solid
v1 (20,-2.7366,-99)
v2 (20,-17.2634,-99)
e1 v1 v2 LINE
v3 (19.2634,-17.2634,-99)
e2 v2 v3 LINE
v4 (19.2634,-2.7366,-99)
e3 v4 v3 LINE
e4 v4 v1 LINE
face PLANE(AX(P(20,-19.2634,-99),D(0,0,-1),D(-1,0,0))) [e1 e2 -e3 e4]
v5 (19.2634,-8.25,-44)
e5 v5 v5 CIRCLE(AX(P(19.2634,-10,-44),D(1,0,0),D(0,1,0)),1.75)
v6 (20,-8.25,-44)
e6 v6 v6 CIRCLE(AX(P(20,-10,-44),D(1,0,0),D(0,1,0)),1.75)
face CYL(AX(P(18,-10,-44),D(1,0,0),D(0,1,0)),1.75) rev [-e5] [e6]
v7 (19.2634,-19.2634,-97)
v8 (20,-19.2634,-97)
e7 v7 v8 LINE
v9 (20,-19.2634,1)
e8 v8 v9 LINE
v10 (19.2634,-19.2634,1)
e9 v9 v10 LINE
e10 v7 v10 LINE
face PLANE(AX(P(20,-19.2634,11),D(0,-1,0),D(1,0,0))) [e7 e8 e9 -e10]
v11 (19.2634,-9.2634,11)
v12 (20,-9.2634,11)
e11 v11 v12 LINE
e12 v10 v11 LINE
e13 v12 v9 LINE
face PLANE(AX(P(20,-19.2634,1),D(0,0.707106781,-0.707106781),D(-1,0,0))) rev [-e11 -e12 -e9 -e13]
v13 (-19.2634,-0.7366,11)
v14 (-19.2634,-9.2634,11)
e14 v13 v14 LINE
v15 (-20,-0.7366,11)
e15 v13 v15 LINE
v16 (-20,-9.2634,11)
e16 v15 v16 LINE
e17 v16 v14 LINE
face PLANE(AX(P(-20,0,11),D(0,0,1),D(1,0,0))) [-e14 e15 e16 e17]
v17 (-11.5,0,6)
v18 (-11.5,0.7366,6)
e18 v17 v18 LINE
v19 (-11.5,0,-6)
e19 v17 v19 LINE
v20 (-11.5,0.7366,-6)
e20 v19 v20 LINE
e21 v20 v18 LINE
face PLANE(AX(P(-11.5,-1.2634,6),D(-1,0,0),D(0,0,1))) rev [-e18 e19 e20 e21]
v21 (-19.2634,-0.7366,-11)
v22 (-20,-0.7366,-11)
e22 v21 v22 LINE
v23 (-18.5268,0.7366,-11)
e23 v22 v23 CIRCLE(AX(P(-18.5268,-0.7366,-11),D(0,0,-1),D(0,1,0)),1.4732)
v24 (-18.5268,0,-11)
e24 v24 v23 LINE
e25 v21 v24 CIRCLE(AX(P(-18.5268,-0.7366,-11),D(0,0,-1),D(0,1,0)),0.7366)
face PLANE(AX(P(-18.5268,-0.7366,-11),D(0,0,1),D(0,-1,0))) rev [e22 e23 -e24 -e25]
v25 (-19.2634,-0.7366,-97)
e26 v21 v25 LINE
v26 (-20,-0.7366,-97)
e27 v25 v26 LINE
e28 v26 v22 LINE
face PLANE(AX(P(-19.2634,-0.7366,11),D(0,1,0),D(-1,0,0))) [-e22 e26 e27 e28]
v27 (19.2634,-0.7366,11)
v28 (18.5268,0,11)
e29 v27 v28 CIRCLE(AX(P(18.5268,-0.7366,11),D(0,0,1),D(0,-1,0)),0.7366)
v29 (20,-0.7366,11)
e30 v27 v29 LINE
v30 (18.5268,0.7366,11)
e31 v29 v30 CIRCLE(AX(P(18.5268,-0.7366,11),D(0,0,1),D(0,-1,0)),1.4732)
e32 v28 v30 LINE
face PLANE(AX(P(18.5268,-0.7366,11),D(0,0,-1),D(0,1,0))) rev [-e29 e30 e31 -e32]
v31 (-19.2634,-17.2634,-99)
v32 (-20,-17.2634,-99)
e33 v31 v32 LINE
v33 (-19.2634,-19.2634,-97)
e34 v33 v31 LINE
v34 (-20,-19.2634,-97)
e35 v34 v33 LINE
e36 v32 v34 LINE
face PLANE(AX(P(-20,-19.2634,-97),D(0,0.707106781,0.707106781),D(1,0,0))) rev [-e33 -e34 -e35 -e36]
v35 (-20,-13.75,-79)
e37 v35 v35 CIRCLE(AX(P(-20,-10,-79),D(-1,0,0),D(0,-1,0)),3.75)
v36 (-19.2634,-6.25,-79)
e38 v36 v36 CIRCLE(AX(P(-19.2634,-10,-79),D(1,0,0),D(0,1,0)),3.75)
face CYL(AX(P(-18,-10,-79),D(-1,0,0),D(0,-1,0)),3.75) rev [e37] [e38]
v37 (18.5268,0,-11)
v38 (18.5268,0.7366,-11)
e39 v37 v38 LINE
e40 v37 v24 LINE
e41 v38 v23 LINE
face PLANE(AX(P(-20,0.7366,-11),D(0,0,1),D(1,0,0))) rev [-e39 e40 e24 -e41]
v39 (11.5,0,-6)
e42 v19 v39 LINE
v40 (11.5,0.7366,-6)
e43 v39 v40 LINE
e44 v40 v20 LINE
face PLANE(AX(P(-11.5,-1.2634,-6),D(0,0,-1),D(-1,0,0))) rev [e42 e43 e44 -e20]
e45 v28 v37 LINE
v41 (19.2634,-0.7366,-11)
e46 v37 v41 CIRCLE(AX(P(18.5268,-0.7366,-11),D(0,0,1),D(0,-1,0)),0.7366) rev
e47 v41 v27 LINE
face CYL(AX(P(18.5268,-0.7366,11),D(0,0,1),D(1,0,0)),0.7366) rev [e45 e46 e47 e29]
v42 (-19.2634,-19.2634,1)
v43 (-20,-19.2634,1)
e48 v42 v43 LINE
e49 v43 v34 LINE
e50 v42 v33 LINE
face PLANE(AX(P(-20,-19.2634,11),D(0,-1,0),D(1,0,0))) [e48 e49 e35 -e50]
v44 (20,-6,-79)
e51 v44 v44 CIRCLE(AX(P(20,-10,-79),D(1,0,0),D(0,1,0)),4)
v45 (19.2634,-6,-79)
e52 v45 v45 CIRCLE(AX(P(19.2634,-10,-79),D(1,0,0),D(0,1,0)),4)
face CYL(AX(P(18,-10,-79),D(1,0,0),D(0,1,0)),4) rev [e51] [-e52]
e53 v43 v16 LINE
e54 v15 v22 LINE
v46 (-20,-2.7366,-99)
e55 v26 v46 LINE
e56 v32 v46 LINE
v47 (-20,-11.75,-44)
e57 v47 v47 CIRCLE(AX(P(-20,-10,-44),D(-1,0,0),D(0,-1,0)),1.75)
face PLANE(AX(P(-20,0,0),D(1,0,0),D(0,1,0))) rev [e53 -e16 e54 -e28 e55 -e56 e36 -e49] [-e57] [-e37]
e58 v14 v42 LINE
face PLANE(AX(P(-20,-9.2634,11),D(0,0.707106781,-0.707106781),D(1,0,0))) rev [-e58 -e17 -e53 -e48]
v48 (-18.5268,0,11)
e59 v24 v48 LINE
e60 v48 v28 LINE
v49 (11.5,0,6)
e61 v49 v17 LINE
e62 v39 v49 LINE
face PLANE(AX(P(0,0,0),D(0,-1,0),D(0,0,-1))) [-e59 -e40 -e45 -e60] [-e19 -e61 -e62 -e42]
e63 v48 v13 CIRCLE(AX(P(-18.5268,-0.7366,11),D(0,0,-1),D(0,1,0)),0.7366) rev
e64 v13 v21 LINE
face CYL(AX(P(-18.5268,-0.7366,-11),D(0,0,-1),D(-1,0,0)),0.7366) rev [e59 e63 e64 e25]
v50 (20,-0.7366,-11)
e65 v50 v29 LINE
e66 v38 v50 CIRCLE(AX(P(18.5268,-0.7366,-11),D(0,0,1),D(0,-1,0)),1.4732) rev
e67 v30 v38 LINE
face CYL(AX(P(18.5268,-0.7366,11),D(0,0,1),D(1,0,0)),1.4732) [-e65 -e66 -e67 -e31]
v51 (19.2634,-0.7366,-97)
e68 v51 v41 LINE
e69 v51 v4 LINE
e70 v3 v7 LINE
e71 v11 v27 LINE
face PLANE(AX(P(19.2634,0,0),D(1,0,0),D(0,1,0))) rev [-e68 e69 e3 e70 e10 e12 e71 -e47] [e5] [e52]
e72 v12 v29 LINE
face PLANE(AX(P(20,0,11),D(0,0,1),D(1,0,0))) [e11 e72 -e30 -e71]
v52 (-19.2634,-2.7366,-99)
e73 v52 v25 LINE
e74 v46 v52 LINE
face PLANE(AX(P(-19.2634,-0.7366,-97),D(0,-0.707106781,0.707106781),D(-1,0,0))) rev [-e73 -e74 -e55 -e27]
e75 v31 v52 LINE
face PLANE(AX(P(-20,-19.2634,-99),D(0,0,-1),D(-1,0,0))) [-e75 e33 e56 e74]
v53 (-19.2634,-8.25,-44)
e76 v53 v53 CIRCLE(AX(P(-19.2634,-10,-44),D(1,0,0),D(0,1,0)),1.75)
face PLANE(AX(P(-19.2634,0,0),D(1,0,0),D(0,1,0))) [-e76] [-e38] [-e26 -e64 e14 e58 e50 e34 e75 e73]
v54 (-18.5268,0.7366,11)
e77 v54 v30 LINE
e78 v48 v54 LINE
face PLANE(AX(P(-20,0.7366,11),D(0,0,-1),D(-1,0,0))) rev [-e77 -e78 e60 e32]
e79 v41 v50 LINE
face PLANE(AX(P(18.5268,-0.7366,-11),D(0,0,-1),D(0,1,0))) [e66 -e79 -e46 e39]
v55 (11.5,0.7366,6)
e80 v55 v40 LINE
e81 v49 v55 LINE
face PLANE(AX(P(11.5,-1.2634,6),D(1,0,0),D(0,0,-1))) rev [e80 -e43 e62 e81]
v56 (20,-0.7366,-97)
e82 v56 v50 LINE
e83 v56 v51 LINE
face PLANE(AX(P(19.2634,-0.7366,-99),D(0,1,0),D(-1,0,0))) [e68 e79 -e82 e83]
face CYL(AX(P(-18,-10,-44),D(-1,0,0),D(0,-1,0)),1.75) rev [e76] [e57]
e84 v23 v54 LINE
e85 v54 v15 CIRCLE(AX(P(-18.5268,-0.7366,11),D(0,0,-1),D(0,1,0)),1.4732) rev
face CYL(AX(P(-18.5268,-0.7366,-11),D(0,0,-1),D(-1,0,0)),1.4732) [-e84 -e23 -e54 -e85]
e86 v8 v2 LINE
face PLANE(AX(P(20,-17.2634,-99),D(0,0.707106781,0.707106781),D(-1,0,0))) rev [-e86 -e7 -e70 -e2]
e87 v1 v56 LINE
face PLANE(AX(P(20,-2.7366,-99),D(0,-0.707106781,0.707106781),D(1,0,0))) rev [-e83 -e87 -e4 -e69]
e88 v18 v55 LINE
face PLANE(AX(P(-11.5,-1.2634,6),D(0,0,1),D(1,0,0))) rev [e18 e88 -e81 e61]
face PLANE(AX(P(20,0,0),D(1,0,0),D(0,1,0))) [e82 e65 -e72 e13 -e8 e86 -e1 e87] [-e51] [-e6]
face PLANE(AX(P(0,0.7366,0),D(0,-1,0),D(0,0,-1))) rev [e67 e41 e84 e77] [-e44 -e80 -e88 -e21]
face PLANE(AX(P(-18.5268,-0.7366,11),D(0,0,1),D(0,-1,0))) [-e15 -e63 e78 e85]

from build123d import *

# Parameters (mm, degrees)
SKETCH1_W                      = 40
SKETCH1_H                      = 22
BASE_FLANGE2_DEPTH             = 0.7366
EDGE_FLANGE2_STRIP_W           = 4.4196
EDGE_FLANGE2_STRIP_H           = 0.7366
EDGE_FLANGE2_STRIP_CUT_DEPTH   = 22
EDGE_FLANGE2_STRIP_2_W         = 4.4196
EDGE_FLANGE2_STRIP_2_H         = 0.7366
EDGE_FLANGE2_STRIP_CUT_2_DEPTH = 22
EDGE_FLANGE2_DEPTH             = 22
EDGE_FLANGE2_PROFILE_W         = 110
EDGE_FLANGE2_PROFILE_H         = 18.5268
EDGE_FLANGE2_FLAT_DEPTH        = 0.7366
EDGE_FLANGE2_BEND_DEPTH        = 22
EDGE_FLANGE2_PROFILE_2_W       = 110
EDGE_FLANGE2_PROFILE_2_H       = 18.5268
EDGE_FLANGE2_FLAT_2_DEPTH      = 0.7366
SKETCH32_R                     = 3.75
SKETCH32_R_2                   = 1.75
CUT_EXTRUDE1_DEPTH             = 2
CUT_EXTRUDE2_START             = -2
SKETCH33_R                     = 1.75
SKETCH33_R_2                   = 4
CUT_EXTRUDE2_DEPTH             = 2
CHAMFER1_SIZE                  = 2
CHAMFER2_SIZE                  = 10
SKETCH34_W                     = 23
SKETCH34_H                     = 12
CUT_EXTRUDE3_DEPTH             = 2


# Sheet-metal steps are written as plain solids
with BuildPart() as part:
    # Sketch1 → Base-Flange2 (new body)
    with BuildSketch(Plane(origin=(0, 0, 0), x_dir=(1, 0, 0), z_dir=(0, 1, 0))):
        Rectangle(SKETCH1_W, SKETCH1_H)
    extrude(amount=BASE_FLANGE2_DEPTH)

    # Edge-Flange2 strip (across the edge) → Edge-Flange2 strip cut (cut)
    with BuildSketch(Plane(origin=(20, 0, -11), x_dir=(-1, 0, 0), z_dir=(0, 0, 1))):
        with Locations((-0.7366, -0.3683)):
            Rectangle(EDGE_FLANGE2_STRIP_W, EDGE_FLANGE2_STRIP_H)
    extrude(amount=EDGE_FLANGE2_STRIP_CUT_DEPTH, mode=Mode.SUBTRACT)

    # Edge-Flange2 strip 2 (across the edge) → Edge-Flange2 strip cut 2 (cut)
    with BuildSketch(Plane(origin=(-20, 0, 11), x_dir=(1, 0, 0), z_dir=(0, 0, -1))):
        with Locations((-0.7366, -0.3683)):
            Rectangle(EDGE_FLANGE2_STRIP_2_W, EDGE_FLANGE2_STRIP_2_H)
    extrude(amount=EDGE_FLANGE2_STRIP_CUT_2_DEPTH, mode=Mode.SUBTRACT)

    # Edge-Flange2 bend section (across the edge) → Edge-Flange2 (add)
    with BuildSketch(Plane(origin=(20, 0, -11), x_dir=(-1, 0, 0), z_dir=(0, 0, 1))):
        with BuildLine():
            Line((0, 0.7366), (0.7366, 0.7366))
            ThreePointArc((0.7366, 0.7366), (0.952345145, 0.215745145), (1.4732, 0))
            Line((1.4732, 0), (1.4732, -0.7366))
            ThreePointArc((1.4732, -0.7366), (0.43149029, -0.30510971), (0, 0.7366))
        make_face()
    extrude(amount=EDGE_FLANGE2_DEPTH)

    # Edge-Flange2 profile (on flange) → Edge-Flange2 flat (add)
    with BuildSketch(Plane(origin=(20, 0, 0), x_dir=(0, 0, -1), z_dir=(-1, 0, 0))):
        with Locations((44, 10)):
            Rectangle(EDGE_FLANGE2_PROFILE_W, EDGE_FLANGE2_PROFILE_H)
    extrude(amount=EDGE_FLANGE2_FLAT_DEPTH)

    # Edge-Flange2 bend section 2 (across the edge) → Edge-Flange2 bend (add)
    with BuildSketch(Plane(origin=(-20, 0, 11), x_dir=(1, 0, 0), z_dir=(0, 0, -1))):
        with BuildLine():
            Line((0, 0.7366), (0.7366, 0.7366))
            ThreePointArc((0.7366, 0.7366), (0.952345145, 0.215745145), (1.4732, 0))
            Line((1.4732, 0), (1.4732, -0.7366))
            ThreePointArc((1.4732, -0.7366), (0.43149029, -0.30510971), (0, 0.7366))
        make_face()
    extrude(amount=EDGE_FLANGE2_BEND_DEPTH)

    # Edge-Flange2 profile 2 (on flange) → Edge-Flange2 flat 2 (add)
    with BuildSketch(Plane(origin=(-20, 0, 0), x_dir=(0, 0, 1), z_dir=(1, 0, 0))):
        with Locations((-44, 10)):
            Rectangle(EDGE_FLANGE2_PROFILE_2_W, EDGE_FLANGE2_PROFILE_2_H)
    extrude(amount=EDGE_FLANGE2_FLAT_2_DEPTH)

    # Sketch32 → Cut-Extrude1 (cut)
    with BuildSketch(Plane.ZY.offset(20)):
        with Locations(Location((-79, -10, 0), (0, 0, 270))):
            Circle(SKETCH32_R)
        with Locations(Location((-44, -10, 0), (0, 0, 270))):
            Circle(SKETCH32_R_2)
    extrude(amount=-CUT_EXTRUDE1_DEPTH, mode=Mode.SUBTRACT)

    # Sketch33 → Cut-Extrude2 (cut)
    with BuildSketch(Plane(origin=(20, 0, 0), x_dir=(0, 0, -1), z_dir=(1, 0, 0)).offset(CUT_EXTRUDE2_START)):
        with Locations(Location((44, -10, 0), (0, 0, 270))):
            Circle(SKETCH33_R)
        with Locations(Location((79, -10, 0), (0, 0, 90))):
            Circle(SKETCH33_R_2)
    extrude(amount=CUT_EXTRUDE2_DEPTH, mode=Mode.SUBTRACT)

    # Chamfer1
    chamfer1_edges = [part.edges().sort_by_distance(p)[0] for p in [
        (19.6317, -0.7366, -99),
        (19.6317, -19.2634, -99),
        (-19.6317, -0.7366, -99),
        (-19.6317, -19.2634, -99),
    ]]
    chamfer(chamfer1_edges, length=CHAMFER1_SIZE)

    # Chamfer2
    chamfer2_edges = [part.edges().sort_by_distance(p)[0] for p in [
        (19.6317, -19.2634, 11),
        (-19.6317, -19.2634, 11),
    ]]
    chamfer(chamfer2_edges, length=CHAMFER2_SIZE)

    # Sketch34 → Cut-Extrude3 (cut)
    with BuildSketch(Plane(origin=(0, 0.7366, 0), x_dir=(1, 0, 0), z_dir=(0, 1, 0))):
        Rectangle(SKETCH34_W, SKETCH34_H)
    extrude(amount=-CUT_EXTRUDE3_DEPTH, mode=Mode.SUBTRACT)


solid = part.part
